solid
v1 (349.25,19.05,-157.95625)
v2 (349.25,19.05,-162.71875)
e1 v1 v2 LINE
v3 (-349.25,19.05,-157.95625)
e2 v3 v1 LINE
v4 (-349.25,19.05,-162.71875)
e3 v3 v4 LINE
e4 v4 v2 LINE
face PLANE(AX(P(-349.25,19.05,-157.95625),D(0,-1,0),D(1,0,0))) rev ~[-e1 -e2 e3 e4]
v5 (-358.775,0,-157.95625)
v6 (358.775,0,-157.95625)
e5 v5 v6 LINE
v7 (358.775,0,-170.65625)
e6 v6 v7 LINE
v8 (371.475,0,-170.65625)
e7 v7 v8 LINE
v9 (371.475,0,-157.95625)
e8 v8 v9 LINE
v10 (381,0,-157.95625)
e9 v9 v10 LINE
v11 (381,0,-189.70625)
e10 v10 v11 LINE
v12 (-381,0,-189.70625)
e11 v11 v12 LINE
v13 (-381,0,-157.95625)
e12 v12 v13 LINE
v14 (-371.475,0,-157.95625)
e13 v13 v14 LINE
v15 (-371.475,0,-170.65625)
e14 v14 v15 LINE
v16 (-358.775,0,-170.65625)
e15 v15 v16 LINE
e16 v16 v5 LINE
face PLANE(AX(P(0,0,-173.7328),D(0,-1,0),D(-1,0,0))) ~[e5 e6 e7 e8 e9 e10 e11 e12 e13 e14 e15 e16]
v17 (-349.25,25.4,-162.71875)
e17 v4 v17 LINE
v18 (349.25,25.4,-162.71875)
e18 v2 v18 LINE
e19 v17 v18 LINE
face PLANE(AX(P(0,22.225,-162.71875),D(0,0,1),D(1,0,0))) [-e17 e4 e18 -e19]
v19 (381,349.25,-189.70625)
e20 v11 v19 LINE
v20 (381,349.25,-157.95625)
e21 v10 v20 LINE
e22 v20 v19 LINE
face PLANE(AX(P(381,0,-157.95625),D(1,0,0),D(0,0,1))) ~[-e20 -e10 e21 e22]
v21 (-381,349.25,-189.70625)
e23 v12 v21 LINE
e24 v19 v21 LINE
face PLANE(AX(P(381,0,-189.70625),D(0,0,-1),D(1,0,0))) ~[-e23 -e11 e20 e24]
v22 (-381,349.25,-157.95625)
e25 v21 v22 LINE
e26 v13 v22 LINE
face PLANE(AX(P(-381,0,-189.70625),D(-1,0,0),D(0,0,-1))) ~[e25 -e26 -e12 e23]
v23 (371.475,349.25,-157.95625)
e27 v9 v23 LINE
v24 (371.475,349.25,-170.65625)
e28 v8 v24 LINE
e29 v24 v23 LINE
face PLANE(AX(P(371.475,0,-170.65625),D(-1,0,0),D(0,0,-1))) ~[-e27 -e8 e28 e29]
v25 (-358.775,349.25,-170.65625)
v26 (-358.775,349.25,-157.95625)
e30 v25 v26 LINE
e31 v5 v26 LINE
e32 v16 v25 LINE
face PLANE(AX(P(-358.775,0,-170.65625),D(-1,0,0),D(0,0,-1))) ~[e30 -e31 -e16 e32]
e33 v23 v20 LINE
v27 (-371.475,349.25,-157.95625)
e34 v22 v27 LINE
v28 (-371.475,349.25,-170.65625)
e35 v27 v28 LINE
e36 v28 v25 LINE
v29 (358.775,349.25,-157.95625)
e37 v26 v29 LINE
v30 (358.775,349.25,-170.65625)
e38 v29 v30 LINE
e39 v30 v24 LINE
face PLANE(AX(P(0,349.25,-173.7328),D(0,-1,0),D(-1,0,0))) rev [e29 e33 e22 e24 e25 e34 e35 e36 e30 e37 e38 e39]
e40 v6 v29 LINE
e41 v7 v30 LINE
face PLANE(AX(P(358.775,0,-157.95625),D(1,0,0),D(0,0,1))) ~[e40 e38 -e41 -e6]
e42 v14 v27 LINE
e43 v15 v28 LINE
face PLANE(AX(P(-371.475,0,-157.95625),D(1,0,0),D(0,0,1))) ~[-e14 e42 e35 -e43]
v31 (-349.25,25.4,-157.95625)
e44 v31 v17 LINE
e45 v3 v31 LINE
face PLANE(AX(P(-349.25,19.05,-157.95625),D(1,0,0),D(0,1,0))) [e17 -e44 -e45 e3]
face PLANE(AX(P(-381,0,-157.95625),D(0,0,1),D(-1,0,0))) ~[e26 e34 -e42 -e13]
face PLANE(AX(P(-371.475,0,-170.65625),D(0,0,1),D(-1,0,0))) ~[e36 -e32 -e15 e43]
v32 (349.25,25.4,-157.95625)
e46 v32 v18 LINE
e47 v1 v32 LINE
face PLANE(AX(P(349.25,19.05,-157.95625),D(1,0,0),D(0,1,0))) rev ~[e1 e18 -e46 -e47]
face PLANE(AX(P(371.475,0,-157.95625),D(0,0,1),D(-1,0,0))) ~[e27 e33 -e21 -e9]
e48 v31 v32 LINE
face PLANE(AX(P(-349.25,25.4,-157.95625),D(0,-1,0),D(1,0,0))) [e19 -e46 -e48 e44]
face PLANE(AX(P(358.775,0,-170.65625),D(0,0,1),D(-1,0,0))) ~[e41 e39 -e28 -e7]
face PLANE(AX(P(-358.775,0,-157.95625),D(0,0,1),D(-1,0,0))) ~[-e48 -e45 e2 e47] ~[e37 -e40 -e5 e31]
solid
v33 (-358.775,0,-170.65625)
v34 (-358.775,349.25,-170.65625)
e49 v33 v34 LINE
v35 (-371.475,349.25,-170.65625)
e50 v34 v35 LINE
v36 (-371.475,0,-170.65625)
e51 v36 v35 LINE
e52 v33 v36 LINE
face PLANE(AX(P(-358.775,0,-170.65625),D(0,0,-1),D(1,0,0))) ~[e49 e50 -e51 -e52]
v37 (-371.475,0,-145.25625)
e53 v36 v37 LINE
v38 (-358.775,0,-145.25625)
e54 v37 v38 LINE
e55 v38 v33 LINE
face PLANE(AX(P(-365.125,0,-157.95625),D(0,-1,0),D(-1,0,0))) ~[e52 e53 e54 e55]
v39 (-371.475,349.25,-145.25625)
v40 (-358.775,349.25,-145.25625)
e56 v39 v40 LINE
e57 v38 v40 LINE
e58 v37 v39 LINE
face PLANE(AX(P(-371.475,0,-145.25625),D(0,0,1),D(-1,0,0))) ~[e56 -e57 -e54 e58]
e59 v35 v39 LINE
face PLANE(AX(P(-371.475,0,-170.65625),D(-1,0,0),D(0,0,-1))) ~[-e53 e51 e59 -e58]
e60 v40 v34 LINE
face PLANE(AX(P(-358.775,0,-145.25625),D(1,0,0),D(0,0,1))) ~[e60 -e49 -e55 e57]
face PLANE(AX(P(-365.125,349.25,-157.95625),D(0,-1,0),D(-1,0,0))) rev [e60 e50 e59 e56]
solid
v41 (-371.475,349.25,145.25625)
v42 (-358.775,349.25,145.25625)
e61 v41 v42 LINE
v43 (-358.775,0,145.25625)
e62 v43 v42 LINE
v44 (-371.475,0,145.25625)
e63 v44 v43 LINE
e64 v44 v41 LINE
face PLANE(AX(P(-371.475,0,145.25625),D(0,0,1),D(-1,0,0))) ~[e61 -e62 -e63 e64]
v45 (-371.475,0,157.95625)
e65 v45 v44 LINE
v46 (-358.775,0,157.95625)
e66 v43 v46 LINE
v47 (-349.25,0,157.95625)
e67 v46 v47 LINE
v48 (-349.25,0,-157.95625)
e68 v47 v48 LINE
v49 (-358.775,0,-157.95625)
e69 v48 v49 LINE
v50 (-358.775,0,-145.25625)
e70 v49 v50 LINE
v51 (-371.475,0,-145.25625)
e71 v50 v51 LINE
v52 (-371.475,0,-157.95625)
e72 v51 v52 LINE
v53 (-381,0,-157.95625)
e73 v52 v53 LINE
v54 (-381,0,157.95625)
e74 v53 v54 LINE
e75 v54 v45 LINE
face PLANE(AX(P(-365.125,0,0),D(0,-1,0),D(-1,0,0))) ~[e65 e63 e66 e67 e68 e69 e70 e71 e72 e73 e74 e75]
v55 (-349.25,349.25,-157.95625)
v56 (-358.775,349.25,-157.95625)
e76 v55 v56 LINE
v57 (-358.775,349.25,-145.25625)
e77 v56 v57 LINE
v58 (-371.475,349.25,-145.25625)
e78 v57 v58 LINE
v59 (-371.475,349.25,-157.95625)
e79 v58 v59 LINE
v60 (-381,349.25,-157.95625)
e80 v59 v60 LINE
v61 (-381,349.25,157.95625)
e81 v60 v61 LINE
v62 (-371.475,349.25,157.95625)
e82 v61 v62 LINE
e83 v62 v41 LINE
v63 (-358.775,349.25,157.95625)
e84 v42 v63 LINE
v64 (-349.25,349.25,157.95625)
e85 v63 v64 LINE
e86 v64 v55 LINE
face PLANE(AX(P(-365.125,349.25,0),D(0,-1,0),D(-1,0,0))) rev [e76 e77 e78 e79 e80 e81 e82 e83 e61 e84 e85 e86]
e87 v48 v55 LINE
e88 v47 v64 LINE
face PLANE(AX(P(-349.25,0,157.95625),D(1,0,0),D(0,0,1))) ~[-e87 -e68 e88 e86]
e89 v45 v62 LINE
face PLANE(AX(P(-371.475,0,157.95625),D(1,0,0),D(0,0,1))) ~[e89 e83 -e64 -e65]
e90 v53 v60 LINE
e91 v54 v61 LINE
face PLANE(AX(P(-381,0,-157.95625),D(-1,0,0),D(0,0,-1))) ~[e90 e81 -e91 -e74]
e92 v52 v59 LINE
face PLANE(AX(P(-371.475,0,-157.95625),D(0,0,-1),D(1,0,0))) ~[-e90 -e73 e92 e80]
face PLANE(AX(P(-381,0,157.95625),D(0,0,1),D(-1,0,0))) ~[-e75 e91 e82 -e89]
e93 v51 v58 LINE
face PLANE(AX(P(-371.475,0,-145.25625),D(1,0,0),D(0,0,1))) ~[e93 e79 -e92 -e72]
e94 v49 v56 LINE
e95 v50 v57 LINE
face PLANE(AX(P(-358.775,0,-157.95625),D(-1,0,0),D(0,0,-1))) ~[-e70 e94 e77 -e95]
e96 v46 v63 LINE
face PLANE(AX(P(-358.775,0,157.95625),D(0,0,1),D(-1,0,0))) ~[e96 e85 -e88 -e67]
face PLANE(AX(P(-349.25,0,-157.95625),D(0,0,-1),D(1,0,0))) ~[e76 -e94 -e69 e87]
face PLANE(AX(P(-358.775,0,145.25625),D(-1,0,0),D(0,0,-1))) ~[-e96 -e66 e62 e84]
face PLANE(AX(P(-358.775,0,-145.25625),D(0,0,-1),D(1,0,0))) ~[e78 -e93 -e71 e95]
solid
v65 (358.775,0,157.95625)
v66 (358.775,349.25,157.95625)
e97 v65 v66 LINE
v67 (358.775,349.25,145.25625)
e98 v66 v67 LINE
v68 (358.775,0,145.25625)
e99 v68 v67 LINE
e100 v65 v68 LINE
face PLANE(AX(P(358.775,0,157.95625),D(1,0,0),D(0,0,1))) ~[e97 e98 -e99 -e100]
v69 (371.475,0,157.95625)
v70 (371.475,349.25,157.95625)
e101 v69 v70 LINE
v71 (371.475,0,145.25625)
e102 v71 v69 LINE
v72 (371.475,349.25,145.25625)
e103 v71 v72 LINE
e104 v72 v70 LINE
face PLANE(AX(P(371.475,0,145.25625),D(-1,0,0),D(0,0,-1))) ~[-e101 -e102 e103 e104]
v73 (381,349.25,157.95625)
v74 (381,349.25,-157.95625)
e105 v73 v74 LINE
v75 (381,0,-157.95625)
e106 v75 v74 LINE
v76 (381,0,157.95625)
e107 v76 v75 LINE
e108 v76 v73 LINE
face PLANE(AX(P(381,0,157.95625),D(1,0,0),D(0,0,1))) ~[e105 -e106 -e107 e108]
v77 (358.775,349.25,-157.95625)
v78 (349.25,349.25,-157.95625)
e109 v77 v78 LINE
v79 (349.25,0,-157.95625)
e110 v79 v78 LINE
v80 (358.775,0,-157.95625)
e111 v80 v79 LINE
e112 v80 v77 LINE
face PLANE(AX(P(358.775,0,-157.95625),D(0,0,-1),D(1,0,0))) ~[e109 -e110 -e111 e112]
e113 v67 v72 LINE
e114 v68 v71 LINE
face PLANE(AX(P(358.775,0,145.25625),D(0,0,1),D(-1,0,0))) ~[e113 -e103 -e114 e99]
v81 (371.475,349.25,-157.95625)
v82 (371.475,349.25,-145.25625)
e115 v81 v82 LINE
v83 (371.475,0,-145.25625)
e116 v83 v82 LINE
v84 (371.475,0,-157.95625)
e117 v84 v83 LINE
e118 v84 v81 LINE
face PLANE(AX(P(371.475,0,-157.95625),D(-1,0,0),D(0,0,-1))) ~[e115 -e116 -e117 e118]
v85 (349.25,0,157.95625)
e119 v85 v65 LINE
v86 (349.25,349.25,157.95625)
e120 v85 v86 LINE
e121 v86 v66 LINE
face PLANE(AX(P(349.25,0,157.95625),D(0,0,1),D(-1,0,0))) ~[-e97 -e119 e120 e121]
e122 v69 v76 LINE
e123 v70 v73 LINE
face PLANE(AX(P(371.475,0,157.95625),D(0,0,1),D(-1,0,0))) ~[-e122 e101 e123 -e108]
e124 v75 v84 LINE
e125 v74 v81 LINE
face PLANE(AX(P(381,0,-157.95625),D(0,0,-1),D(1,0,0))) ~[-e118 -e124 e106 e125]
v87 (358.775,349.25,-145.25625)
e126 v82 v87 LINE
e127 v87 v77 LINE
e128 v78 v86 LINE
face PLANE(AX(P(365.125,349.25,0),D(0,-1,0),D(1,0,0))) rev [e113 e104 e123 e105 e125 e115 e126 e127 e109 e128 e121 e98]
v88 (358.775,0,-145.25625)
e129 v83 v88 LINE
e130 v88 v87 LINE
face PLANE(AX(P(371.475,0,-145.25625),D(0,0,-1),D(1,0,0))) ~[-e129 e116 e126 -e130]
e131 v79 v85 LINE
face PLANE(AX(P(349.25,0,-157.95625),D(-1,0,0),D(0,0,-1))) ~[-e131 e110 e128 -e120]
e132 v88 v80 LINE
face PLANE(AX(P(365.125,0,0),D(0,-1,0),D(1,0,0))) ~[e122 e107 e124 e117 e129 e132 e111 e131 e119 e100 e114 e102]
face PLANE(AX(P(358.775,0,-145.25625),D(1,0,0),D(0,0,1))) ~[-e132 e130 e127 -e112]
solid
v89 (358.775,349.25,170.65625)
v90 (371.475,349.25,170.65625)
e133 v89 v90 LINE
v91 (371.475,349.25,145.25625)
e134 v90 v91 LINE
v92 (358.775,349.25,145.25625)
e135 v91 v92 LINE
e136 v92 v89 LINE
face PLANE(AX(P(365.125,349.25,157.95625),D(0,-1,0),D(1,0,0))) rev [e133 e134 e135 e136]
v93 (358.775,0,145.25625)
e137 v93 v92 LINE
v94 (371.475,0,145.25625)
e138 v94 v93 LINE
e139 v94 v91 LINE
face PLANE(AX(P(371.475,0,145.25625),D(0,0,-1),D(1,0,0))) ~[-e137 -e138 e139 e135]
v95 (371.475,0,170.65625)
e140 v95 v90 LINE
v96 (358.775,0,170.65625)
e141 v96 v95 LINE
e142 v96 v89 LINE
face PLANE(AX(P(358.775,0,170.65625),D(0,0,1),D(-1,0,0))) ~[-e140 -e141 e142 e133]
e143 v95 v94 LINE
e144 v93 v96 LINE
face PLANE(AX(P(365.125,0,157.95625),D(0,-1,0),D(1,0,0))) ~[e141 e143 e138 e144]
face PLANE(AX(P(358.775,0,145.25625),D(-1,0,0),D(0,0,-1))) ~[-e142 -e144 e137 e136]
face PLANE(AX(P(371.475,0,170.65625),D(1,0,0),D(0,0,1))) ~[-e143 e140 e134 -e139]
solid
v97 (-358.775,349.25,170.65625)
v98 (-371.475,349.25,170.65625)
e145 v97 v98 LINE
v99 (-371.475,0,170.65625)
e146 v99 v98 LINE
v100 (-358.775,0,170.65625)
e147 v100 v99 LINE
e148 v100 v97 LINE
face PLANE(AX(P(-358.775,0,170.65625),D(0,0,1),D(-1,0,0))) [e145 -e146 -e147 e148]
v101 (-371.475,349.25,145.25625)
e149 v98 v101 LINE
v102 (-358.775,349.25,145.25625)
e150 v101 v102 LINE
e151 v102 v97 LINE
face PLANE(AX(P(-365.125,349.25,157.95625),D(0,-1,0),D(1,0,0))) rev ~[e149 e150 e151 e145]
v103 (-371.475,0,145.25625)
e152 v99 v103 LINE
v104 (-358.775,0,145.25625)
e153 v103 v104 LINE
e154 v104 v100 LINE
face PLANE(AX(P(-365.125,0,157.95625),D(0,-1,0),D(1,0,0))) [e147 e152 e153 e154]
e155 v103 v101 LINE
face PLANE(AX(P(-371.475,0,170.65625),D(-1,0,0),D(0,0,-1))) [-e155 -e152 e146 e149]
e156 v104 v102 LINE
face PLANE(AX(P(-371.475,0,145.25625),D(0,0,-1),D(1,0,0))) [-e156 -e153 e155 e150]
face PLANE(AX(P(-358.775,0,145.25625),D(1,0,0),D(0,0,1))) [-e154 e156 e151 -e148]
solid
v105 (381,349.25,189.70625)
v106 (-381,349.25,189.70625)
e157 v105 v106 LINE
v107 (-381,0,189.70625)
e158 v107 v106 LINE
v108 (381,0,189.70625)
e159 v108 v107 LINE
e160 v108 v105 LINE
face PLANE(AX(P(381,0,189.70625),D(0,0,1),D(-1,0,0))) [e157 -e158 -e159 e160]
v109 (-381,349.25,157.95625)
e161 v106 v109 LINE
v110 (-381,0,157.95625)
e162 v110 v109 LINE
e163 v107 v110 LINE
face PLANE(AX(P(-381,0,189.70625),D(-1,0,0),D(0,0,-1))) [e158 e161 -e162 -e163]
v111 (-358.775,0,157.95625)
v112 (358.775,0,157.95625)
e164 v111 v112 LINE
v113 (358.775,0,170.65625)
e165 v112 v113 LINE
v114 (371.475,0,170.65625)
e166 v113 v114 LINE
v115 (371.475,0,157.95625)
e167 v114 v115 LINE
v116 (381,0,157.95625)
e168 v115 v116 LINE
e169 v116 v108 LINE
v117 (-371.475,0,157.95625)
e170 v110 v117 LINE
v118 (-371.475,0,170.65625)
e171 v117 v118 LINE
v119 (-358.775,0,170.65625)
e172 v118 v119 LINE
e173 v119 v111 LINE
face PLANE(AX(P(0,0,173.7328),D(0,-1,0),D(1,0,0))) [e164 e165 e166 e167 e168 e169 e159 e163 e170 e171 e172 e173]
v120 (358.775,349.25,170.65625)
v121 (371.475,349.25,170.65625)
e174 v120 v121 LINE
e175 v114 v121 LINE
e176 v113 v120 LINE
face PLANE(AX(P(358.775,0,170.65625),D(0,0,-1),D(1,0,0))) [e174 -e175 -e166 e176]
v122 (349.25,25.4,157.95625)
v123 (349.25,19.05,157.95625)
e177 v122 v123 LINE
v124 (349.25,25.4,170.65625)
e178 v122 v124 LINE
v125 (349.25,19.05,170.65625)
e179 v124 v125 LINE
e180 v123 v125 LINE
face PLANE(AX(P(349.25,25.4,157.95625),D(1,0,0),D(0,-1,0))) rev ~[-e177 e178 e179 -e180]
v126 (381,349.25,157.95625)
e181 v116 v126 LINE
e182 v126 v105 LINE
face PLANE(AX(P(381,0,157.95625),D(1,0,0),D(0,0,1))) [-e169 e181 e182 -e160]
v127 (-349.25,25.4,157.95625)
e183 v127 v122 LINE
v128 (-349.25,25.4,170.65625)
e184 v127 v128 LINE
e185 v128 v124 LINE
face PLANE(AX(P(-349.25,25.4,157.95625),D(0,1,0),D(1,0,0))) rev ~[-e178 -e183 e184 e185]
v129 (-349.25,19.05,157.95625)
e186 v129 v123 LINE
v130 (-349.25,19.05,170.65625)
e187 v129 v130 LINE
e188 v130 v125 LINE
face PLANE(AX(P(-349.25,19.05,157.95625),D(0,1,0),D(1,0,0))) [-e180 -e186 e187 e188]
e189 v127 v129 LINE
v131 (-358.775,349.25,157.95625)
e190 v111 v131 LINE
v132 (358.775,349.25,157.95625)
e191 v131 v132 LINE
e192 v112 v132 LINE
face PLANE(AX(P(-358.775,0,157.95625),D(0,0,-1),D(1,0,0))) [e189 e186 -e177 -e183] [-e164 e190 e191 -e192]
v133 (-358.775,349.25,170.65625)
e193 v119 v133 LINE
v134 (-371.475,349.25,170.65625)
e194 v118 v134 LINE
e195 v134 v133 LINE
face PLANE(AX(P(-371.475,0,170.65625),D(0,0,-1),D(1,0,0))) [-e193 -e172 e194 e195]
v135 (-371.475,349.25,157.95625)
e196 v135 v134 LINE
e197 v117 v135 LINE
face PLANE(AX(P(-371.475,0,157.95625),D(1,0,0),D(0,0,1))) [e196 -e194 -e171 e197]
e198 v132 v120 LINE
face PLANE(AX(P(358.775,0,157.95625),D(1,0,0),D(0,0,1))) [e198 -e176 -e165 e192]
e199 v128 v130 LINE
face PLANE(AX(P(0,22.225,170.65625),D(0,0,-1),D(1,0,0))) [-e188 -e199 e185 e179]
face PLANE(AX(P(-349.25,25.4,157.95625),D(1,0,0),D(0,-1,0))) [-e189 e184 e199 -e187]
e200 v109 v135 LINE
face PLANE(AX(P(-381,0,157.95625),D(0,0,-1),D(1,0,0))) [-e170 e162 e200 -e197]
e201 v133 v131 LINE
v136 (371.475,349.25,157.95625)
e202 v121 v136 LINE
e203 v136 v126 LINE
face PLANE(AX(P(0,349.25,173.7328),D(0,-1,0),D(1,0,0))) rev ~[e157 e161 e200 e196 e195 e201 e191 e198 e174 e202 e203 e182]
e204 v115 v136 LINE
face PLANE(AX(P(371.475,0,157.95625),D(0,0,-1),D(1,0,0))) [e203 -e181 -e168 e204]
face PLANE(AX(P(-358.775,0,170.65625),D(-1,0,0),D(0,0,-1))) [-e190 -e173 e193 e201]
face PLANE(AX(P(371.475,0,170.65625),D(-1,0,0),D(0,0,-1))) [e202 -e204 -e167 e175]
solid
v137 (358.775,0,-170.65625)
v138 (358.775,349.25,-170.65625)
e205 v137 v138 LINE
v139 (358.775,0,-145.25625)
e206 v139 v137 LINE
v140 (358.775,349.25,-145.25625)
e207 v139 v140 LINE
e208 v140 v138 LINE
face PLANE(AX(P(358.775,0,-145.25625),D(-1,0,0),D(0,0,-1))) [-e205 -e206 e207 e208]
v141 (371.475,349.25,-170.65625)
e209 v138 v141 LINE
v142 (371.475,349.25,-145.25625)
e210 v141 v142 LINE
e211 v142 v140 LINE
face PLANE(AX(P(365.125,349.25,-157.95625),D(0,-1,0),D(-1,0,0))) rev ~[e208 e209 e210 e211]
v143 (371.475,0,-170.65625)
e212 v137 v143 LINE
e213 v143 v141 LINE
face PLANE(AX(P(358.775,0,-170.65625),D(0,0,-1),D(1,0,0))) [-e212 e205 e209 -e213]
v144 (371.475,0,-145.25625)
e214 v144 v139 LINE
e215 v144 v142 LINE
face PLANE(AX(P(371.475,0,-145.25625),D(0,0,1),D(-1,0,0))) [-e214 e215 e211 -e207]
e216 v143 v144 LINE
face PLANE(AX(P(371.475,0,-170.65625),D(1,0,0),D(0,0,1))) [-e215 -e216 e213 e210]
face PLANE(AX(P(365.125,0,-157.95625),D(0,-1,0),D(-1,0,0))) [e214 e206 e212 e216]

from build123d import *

# Parameters (mm, degrees)
F1_DEPTH  = 349.25
F2_DEPTH  = 349.25
F5_W      = 698.5
F5_H      = 6.35
F6_DEPTH  = 4.7625
F7_W      = 698.5
F7_H      = 6.35
F8_DEPTH  = 12.7
F10_DEPTH = 349.25


# Not quite as in the source:
# - a feature names something its author has since deleted; it is built from what else it names


with BuildPart() as f1:
    # F0 (on Front) → F1 (new body)
    with BuildSketch(Plane.XZ):
        Polygon((371.475, 157.95625), (381, 157.95625), (381, 189.70625), (-381, 189.70625), (-381, 157.95625), (-371.475, 157.95625), (-371.475, 170.65625), (-358.775, 170.65625), (-358.775, 157.95625), (-349.25, 157.95625), (349.25, 157.95625), (358.775, 157.95625), (358.775, 170.65625), (371.475, 170.65625), align=None)
    extrude(amount=-F1_DEPTH)


with BuildPart() as f2:
    # F0 (on Front) → F2 (new body)
    with BuildSketch(Plane.XZ):
        Polygon((-381, 157.95625), (-381, -157.95625), (-371.475, -157.95625), (-371.475, -145.25625), (-358.775, -145.25625), (-358.775, -157.95625), (-349.25, -157.95625), (-349.25, 157.95625), (-358.775, 157.95625), (-358.775, 145.25625), (-371.475, 145.25625), (-371.475, 157.95625), align=None)
    extrude(amount=-F2_DEPTH)


with BuildPart() as f3_1:
    # F3: instance of F1
    add(f1.part.mirror(Plane.XY))

    # F5 (on face) → F6 (cut)
    with BuildSketch(Plane.XY.offset(-157.95625)):
        with Locations((0, 22.225)):
            Rectangle(F5_W, F5_H)
    extrude(amount=-F6_DEPTH, mode=Mode.SUBTRACT)


with BuildPart() as f3_2:
    # F3: instance of F2
    add(f2.part.mirror(Plane.XY))


with BuildPart() as f4_1:
    # F4: instance of F2
    add(f2.part.mirror(Plane.YZ))


with BuildPart() as f1_1:
    add(f1.part)

    # F7 (on face) → F8 (cut)
    with BuildSketch(Plane(origin=(0, 0, 157.95625), x_dir=(1, 0, 0), z_dir=(0, 0, -1))):
        with Locations((0, -22.225)):
            Rectangle(F7_W, F7_H)
    extrude(amount=-F8_DEPTH, mode=Mode.SUBTRACT)


with BuildPart() as f10:
    # F9 (on face) → F10 (new body, through all)
    with BuildSketch(Plane.XZ):
        Polygon((-371.475, 170.65625), (-371.475, 157.95625), (-371.475, 145.25625), (-358.775, 145.25625), (-358.775, 157.95625), (-358.775, 170.65625), align=None)
    extrude(amount=-F10_DEPTH)


with BuildPart() as f11_1:
    # F11: instance of F10
    add(f10.part.mirror(Plane.YZ))


with BuildPart() as f12_1:
    # F12: instance of F10
    add(f10.part.mirror(Plane.XY))


with BuildPart() as f12_2:
    # F12: instance of F11_1
    add(f11_1.part.mirror(Plane.XY))


solid = Compound([f3_1.part, f3_2.part, f4_1.part, f1_1.part, f10.part, f11_1.part, f12_1.part, f12_2.part])
